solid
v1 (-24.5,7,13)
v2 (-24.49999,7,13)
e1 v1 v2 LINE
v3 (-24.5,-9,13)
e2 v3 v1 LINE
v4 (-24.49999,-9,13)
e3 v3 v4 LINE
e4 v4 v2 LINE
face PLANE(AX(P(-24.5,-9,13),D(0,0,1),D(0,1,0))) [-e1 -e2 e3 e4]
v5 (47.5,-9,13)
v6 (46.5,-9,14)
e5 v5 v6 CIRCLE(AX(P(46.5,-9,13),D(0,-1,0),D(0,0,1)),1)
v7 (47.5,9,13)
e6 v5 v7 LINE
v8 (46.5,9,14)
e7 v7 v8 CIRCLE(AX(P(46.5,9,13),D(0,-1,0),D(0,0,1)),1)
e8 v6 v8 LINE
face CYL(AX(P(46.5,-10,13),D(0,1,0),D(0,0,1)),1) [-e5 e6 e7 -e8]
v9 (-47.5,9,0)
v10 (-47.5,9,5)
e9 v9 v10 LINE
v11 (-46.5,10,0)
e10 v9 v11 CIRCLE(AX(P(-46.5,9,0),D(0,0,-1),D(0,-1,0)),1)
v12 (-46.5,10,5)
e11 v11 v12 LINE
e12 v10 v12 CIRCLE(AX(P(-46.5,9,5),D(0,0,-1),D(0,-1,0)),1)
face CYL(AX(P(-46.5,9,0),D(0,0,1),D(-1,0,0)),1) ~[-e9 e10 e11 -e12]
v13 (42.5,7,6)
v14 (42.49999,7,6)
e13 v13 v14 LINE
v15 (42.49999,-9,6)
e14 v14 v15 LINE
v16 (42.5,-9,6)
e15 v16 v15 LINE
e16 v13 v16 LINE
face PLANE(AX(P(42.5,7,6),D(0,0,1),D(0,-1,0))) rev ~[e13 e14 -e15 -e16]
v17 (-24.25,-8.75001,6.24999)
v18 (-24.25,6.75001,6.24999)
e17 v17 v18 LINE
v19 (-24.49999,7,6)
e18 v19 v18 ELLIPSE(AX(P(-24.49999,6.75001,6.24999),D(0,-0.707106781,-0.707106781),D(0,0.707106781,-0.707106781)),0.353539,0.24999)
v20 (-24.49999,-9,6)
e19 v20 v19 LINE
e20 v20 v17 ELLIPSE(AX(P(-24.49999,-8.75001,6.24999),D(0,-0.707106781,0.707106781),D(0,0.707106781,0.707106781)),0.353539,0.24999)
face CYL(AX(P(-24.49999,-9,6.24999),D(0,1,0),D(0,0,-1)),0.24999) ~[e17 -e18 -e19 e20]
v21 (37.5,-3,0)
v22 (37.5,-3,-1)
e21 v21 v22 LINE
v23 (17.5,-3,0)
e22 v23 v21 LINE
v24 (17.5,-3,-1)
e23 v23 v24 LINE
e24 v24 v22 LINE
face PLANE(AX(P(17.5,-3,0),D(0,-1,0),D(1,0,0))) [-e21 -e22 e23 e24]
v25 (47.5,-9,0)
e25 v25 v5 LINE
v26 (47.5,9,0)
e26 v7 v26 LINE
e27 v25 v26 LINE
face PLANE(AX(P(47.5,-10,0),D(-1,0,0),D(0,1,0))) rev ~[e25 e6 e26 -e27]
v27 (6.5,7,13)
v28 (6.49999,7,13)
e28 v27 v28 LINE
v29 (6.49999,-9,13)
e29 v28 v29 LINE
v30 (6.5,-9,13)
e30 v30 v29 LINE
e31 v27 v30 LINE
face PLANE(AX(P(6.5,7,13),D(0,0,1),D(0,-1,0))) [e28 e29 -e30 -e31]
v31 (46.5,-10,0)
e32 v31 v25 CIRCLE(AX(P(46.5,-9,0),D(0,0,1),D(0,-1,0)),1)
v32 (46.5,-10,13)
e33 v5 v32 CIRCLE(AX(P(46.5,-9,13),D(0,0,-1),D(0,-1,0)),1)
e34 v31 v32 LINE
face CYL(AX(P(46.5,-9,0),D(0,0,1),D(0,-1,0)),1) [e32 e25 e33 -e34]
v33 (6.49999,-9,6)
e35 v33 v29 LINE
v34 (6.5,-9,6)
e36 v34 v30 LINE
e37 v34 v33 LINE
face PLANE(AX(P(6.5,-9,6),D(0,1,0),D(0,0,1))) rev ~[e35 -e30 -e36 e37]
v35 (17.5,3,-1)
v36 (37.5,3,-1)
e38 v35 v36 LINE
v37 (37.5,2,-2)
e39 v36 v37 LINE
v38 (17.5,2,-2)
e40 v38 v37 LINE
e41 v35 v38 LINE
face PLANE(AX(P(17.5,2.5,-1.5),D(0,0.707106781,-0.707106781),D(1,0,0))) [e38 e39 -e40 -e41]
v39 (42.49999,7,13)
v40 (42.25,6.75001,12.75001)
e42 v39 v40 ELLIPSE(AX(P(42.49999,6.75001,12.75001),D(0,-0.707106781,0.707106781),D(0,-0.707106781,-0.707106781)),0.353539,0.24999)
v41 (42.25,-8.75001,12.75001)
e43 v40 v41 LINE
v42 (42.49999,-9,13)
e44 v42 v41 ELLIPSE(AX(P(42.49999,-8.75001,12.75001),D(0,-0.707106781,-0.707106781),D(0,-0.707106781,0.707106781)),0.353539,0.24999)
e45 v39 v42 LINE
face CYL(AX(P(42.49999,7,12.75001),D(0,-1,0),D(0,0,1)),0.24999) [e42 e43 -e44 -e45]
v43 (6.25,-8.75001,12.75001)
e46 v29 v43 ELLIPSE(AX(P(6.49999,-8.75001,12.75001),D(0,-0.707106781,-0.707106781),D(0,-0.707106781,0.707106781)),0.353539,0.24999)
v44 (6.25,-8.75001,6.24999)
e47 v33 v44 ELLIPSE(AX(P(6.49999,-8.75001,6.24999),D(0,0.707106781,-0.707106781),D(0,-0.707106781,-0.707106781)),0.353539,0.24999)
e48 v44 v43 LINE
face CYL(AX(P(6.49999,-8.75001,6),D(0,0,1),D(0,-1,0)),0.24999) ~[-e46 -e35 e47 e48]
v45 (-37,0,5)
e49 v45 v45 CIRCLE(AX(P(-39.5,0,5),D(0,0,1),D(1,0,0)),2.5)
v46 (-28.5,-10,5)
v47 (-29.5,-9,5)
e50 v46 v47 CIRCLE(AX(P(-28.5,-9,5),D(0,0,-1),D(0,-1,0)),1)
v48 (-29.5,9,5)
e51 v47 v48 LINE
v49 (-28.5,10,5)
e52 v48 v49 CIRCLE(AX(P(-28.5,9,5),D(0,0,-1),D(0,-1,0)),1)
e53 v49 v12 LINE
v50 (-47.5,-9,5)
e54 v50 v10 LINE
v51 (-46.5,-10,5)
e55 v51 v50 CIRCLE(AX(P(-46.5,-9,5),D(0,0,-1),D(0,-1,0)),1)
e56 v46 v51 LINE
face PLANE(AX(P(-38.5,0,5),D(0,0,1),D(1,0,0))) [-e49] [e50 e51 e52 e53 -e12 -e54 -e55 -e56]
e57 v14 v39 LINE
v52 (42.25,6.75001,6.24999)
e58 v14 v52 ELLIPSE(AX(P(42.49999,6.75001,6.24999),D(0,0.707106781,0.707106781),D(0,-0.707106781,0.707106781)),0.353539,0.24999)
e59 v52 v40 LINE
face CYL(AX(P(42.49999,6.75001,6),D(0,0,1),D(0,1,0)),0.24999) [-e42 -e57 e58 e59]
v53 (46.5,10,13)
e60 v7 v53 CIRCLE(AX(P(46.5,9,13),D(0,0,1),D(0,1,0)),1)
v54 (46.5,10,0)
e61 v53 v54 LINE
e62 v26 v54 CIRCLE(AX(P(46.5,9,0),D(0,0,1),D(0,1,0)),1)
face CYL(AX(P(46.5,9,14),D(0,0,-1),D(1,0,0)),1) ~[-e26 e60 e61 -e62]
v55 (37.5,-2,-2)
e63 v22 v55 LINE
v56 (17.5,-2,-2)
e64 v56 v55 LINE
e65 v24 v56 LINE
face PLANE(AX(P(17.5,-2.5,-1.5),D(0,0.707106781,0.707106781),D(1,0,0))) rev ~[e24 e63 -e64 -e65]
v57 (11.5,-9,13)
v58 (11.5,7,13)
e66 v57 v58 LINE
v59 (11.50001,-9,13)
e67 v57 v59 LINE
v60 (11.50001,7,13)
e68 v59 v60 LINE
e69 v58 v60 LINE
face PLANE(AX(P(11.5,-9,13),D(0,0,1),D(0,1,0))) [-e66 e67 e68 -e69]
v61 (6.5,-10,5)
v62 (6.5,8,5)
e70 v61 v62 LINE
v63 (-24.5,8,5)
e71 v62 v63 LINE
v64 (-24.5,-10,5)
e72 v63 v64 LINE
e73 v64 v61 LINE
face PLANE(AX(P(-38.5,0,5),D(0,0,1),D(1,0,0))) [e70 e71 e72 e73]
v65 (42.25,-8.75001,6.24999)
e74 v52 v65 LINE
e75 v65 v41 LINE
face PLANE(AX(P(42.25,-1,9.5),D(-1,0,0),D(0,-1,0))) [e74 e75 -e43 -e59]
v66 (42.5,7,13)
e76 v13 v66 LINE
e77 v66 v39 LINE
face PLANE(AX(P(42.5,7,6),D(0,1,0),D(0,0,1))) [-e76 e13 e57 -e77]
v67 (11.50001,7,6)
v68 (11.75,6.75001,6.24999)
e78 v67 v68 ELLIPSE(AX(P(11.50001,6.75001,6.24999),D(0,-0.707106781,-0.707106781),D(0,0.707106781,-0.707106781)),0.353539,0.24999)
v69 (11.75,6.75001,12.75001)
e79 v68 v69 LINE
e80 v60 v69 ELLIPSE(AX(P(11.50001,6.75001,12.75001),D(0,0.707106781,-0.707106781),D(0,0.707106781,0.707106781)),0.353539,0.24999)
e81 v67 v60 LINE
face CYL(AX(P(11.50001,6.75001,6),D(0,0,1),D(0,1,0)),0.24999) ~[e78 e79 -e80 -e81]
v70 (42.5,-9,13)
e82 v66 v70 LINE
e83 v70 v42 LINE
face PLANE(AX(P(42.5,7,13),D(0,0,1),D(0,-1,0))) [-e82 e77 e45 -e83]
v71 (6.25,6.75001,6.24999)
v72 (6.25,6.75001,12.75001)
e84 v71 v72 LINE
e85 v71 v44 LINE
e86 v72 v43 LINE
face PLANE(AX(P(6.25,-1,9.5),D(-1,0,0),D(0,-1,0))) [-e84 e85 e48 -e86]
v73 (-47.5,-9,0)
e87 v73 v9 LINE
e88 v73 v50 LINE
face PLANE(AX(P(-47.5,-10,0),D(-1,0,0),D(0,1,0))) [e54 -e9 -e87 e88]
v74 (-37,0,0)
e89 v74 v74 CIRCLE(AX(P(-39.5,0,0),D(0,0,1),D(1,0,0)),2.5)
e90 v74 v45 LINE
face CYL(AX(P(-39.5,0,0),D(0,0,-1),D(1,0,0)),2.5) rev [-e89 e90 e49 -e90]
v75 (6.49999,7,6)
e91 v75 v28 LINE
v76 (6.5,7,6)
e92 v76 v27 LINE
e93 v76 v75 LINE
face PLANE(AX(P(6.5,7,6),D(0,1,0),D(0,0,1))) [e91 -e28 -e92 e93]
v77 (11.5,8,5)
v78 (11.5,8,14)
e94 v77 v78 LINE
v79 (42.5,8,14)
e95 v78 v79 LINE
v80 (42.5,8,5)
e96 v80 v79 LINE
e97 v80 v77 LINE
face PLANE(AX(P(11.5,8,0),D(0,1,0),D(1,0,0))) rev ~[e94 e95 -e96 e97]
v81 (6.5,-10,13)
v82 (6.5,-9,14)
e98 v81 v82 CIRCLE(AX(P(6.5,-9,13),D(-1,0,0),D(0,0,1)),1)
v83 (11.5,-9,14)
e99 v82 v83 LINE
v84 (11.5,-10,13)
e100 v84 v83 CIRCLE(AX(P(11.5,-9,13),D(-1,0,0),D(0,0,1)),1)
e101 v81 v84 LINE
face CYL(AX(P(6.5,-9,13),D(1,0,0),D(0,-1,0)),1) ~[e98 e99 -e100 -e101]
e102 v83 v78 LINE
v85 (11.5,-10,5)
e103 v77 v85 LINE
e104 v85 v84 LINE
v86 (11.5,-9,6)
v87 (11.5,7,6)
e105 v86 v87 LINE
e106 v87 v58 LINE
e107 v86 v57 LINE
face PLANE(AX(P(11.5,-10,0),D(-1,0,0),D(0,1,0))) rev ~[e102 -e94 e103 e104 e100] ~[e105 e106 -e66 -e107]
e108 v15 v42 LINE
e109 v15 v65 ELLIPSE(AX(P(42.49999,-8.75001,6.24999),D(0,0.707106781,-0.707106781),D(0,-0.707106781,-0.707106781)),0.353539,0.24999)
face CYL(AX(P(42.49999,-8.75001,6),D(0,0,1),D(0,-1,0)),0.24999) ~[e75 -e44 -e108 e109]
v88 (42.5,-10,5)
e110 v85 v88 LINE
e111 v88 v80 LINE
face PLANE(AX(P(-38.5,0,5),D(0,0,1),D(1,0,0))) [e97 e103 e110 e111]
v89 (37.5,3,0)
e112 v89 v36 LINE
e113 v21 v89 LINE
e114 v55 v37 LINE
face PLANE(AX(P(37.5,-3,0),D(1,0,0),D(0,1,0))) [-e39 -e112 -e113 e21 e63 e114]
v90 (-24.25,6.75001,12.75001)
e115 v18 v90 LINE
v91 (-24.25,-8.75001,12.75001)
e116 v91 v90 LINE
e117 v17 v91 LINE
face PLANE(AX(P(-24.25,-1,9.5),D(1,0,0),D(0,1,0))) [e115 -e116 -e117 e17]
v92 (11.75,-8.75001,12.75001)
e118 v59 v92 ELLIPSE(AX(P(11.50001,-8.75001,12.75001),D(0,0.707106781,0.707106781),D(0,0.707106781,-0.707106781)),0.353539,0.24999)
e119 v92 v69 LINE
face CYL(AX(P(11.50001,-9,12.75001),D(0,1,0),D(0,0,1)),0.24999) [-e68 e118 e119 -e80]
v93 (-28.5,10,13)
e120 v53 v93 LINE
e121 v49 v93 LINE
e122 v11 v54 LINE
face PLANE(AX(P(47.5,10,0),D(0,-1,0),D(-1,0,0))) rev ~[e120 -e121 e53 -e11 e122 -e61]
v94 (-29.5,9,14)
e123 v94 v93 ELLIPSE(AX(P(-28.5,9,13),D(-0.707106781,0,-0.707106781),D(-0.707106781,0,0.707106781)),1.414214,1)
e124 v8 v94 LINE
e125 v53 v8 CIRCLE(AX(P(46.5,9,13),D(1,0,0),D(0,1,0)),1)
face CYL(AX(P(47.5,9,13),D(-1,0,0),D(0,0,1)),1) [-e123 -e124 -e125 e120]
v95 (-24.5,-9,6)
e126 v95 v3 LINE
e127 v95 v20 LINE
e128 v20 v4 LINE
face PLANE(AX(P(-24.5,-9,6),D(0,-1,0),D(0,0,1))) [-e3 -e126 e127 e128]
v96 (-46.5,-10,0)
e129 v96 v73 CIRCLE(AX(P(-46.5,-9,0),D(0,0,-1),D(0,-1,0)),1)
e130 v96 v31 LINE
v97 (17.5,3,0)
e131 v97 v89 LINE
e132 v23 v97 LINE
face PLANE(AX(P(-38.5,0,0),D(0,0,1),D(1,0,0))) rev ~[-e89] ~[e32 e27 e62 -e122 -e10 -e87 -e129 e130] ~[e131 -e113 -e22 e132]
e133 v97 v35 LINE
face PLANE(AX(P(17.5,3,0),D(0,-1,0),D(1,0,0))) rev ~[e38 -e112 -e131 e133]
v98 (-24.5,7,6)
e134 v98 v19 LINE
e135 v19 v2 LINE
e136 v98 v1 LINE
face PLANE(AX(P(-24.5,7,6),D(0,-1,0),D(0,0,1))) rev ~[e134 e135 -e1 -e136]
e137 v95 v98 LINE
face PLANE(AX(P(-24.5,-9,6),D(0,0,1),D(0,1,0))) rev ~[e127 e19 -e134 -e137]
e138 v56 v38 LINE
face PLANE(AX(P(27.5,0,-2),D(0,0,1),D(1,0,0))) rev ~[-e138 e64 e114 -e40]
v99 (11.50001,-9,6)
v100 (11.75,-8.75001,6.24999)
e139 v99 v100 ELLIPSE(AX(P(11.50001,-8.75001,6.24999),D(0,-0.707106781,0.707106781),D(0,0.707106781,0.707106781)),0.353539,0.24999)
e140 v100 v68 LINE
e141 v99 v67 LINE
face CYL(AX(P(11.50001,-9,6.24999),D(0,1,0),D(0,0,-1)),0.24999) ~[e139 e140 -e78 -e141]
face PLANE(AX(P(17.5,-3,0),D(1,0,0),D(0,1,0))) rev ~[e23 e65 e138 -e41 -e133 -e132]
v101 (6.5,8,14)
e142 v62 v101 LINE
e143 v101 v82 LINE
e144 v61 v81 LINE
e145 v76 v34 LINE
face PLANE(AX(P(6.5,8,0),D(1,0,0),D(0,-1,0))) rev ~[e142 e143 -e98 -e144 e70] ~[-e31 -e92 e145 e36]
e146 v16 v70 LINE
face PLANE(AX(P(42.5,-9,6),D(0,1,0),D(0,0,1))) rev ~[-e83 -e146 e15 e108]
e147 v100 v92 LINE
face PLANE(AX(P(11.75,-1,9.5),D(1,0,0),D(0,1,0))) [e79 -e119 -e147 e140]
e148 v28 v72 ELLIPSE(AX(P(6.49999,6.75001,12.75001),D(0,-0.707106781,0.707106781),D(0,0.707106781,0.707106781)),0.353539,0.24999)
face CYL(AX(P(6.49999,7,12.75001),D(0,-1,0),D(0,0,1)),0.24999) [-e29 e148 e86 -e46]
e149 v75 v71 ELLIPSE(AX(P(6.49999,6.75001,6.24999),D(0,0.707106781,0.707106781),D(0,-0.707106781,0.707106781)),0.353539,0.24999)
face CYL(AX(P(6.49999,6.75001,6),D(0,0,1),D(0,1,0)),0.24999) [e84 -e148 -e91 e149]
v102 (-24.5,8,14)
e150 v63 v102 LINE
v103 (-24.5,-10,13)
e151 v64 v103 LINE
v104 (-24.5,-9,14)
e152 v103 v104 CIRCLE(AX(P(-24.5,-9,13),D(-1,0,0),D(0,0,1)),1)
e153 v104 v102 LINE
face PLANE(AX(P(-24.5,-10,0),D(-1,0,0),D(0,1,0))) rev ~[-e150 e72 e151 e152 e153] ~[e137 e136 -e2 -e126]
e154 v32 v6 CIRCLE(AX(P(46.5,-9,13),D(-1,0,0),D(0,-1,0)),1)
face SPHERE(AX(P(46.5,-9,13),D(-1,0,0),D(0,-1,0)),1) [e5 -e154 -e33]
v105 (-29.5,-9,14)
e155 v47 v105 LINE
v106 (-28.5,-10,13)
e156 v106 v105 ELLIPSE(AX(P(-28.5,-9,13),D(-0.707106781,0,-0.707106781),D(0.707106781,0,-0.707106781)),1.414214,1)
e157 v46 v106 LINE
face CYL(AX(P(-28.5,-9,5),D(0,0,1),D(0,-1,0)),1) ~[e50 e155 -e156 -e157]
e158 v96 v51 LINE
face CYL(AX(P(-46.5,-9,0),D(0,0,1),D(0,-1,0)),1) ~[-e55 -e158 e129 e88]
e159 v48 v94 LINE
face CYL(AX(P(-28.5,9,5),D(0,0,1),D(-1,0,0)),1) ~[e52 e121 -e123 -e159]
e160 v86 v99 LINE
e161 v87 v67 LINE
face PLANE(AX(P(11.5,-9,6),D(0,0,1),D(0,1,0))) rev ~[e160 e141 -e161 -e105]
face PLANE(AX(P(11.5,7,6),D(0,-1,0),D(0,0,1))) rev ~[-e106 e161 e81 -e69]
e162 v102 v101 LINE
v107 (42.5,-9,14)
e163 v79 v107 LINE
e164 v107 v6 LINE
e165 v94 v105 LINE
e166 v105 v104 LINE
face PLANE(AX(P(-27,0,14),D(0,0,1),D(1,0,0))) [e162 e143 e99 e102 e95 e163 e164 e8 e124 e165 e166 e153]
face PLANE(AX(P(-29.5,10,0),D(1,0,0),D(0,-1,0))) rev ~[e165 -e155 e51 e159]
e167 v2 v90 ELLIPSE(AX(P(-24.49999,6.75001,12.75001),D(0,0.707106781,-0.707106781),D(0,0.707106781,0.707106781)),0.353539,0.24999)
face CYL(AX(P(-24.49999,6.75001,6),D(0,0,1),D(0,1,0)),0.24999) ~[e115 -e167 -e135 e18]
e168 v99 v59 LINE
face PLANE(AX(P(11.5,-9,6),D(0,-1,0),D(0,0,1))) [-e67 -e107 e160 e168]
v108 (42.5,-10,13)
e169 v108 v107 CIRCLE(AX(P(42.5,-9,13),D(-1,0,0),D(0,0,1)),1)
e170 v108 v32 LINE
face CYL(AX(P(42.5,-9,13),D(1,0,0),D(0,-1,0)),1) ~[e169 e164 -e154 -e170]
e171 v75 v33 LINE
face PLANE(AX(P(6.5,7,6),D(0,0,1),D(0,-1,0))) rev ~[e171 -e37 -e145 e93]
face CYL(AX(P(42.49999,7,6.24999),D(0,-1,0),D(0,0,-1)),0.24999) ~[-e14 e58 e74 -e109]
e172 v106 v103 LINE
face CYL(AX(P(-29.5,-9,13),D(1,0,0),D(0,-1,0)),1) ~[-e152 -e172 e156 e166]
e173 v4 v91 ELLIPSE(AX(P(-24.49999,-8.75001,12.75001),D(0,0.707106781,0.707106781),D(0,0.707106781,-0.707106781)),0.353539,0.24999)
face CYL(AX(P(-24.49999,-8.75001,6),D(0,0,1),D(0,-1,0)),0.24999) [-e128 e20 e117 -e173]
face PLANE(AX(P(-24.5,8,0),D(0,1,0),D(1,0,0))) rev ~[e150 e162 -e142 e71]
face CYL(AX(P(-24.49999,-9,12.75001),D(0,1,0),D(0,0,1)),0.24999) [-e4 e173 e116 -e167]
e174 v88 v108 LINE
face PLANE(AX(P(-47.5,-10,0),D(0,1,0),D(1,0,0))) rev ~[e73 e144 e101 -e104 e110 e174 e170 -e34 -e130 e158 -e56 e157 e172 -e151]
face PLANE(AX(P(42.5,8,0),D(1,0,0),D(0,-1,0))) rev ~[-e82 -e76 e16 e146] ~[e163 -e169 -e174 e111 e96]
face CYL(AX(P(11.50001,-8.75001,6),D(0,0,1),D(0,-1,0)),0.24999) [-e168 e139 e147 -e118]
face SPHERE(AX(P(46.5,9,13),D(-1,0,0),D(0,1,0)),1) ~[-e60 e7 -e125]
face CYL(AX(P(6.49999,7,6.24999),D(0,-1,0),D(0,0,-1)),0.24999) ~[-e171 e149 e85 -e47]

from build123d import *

# Parameters (mm, degrees)
F0_W      = 18
F0_H      = 20
F0_R      = 2.5
F0_W_2    = 31
F0_H_2    = 18
F0_H_3    = 2
F1_DEPTH  = 5
F2_DEPTH  = 14
F3_W      = 16
F3_H      = 7
F5_W      = 16
F5_H      = 7
F7_DEPTH  = 0.25
F4_W      = 16
F4_H      = 7
F6_W      = 16
F6_H      = 7
F8_DEPTH  = 0.25
F9_R      = 0.24999
F10_R     = 1
F11_W     = 20
F11_H     = 6
F12_DEPTH = 2
F13_SIZE  = 1


# Not quite as in the source:
# - a fillet or chamfer is up to 0.001 mm smaller than in the source, because OpenCascade refuses the exact size


with BuildPart() as f1:
    # F0 (on Top) → F1 (new body)
    with BuildSketch(Plane.XY):
        with Locations((-38.5, 0)):
            Rectangle(F0_W, F0_H)
        with Locations((-39.5, 0)):
            Circle(F0_R, mode=Mode.SUBTRACT)
        Polygon((-24.5, 10), (-29.5, 10), (-29.5, -10), (-24.5, -10), (-24.5, 8), align=None)
        with Locations((-9, -1)):
            Rectangle(F0_W_2, F0_H_2)
        Polygon((11.5, 10), (6.5, 10), (6.5, 8), (6.5, -10), (11.5, -10), (11.5, 8), align=None)
        Polygon((47.5, 10), (42.5, 10), (42.5, 8), (42.5, -10), (47.5, -10), align=None)
        with Locations((-9, 9)):
            Rectangle(F0_W_2, F0_H_3)
        with Locations((27, -1)):
            Rectangle(F0_W_2, F0_H_2)
        with Locations((27, 9)):
            Rectangle(F0_W_2, F0_H_3)
    extrude(amount=F1_DEPTH)

    # F0 (on Top) → F2 (join)
    with BuildSketch(Plane.XY):
        Polygon((-24.5, 10), (-29.5, 10), (-29.5, -10), (-24.5, -10), (-24.5, 8), align=None)
        Polygon((11.5, 10), (6.5, 10), (6.5, 8), (6.5, -10), (11.5, -10), (11.5, 8), align=None)
        Polygon((47.5, 10), (42.5, 10), (42.5, 8), (42.5, -10), (47.5, -10), align=None)
        with Locations((-9, 9)):
            Rectangle(F0_W_2, F0_H_3)
        with Locations((27, 9)):
            Rectangle(F0_W_2, F0_H_3)
    extrude(amount=F2_DEPTH)

    # F3 (on face) + F5 (on face) → F7 (join)
    with BuildSketch(Plane.YZ.offset(-24.5)):
        with Locations((-1, 9.5)):
            Rectangle(F3_W, F3_H)
    with BuildSketch(Plane.YZ.offset(11.5)):
        with Locations((-1, 9.5)):
            Rectangle(F5_W, F5_H)
    extrude(amount=F7_DEPTH)

    # F4 (on face) + F6 (on face) → F8 (join)
    with BuildSketch(Plane(origin=(6.5, 0, 0), x_dir=(0, -1, 0), z_dir=(-1, 0, 0))):
        with Locations((1, 9.5)):
            Rectangle(F4_W, F4_H)
    with BuildSketch(Plane(origin=(42.5, 0, 0), x_dir=(0, -1, 0), z_dir=(-1, 0, 0))):
        with Locations((1, 9.5)):
            Rectangle(F6_W, F6_H)
    extrude(amount=F8_DEPTH)

    # F9 (radius 0.25 in the source; OpenCascade refuses exactly that, so slightly less here)
    f9_edges = [f1.edges().sort_by_distance(p)[0] for p in [
        (-24.25, -1, 13),
        (-24.25, -9, 9.5),
        (-24.25, -1, 6),
        (-24.25, 7, 9.5),
        (6.25, 7, 9.5),
        (6.25, -1, 6),
        (6.25, -9, 9.5),
        (6.25, -1, 13),
        (11.75, -1, 13),
        (11.75, -9, 9.5),
        (11.75, -1, 6),
        (11.75, 7, 9.5),
        (42.25, -1, 13),
        (42.25, 7, 9.5),
        (42.25, -1, 6),
        (42.25, -9, 9.5),
    ]]
    fillet(f9_edges, radius=F9_R)

    # F10
    f10_edges = [f1.edges().sort_by_distance(p)[0] for p in [
        (-27, -10, 14),
        (9, -10, 14),
        (45, -10, 14),
        (9, 10, 14),
        (-47.5, -10, 2.5),
        (-47.5, 10, 2.5),
        (47.5, -10, 7),
        (47.5, 10, 7),
        (47.5, 0, 14),
        (-29.5, -10, 9.5),
        (-29.5, 10, 9.5),
    ]]
    fillet(f10_edges, radius=F10_R)

    # F11 (on face) → F12 (join)
    with BuildSketch(Plane.XY):
        with Locations((27.5, 0)):
            Rectangle(F11_W, F11_H)
    extrude(amount=-F12_DEPTH)

    # F13
    f13_edges = [f1.edges().sort_by_distance(p)[0] for p in [
        (27.5, -3, -2),
        (27.5, 3, -2),
    ]]
    chamfer(f13_edges, length=F13_SIZE)


solid = f1.part
